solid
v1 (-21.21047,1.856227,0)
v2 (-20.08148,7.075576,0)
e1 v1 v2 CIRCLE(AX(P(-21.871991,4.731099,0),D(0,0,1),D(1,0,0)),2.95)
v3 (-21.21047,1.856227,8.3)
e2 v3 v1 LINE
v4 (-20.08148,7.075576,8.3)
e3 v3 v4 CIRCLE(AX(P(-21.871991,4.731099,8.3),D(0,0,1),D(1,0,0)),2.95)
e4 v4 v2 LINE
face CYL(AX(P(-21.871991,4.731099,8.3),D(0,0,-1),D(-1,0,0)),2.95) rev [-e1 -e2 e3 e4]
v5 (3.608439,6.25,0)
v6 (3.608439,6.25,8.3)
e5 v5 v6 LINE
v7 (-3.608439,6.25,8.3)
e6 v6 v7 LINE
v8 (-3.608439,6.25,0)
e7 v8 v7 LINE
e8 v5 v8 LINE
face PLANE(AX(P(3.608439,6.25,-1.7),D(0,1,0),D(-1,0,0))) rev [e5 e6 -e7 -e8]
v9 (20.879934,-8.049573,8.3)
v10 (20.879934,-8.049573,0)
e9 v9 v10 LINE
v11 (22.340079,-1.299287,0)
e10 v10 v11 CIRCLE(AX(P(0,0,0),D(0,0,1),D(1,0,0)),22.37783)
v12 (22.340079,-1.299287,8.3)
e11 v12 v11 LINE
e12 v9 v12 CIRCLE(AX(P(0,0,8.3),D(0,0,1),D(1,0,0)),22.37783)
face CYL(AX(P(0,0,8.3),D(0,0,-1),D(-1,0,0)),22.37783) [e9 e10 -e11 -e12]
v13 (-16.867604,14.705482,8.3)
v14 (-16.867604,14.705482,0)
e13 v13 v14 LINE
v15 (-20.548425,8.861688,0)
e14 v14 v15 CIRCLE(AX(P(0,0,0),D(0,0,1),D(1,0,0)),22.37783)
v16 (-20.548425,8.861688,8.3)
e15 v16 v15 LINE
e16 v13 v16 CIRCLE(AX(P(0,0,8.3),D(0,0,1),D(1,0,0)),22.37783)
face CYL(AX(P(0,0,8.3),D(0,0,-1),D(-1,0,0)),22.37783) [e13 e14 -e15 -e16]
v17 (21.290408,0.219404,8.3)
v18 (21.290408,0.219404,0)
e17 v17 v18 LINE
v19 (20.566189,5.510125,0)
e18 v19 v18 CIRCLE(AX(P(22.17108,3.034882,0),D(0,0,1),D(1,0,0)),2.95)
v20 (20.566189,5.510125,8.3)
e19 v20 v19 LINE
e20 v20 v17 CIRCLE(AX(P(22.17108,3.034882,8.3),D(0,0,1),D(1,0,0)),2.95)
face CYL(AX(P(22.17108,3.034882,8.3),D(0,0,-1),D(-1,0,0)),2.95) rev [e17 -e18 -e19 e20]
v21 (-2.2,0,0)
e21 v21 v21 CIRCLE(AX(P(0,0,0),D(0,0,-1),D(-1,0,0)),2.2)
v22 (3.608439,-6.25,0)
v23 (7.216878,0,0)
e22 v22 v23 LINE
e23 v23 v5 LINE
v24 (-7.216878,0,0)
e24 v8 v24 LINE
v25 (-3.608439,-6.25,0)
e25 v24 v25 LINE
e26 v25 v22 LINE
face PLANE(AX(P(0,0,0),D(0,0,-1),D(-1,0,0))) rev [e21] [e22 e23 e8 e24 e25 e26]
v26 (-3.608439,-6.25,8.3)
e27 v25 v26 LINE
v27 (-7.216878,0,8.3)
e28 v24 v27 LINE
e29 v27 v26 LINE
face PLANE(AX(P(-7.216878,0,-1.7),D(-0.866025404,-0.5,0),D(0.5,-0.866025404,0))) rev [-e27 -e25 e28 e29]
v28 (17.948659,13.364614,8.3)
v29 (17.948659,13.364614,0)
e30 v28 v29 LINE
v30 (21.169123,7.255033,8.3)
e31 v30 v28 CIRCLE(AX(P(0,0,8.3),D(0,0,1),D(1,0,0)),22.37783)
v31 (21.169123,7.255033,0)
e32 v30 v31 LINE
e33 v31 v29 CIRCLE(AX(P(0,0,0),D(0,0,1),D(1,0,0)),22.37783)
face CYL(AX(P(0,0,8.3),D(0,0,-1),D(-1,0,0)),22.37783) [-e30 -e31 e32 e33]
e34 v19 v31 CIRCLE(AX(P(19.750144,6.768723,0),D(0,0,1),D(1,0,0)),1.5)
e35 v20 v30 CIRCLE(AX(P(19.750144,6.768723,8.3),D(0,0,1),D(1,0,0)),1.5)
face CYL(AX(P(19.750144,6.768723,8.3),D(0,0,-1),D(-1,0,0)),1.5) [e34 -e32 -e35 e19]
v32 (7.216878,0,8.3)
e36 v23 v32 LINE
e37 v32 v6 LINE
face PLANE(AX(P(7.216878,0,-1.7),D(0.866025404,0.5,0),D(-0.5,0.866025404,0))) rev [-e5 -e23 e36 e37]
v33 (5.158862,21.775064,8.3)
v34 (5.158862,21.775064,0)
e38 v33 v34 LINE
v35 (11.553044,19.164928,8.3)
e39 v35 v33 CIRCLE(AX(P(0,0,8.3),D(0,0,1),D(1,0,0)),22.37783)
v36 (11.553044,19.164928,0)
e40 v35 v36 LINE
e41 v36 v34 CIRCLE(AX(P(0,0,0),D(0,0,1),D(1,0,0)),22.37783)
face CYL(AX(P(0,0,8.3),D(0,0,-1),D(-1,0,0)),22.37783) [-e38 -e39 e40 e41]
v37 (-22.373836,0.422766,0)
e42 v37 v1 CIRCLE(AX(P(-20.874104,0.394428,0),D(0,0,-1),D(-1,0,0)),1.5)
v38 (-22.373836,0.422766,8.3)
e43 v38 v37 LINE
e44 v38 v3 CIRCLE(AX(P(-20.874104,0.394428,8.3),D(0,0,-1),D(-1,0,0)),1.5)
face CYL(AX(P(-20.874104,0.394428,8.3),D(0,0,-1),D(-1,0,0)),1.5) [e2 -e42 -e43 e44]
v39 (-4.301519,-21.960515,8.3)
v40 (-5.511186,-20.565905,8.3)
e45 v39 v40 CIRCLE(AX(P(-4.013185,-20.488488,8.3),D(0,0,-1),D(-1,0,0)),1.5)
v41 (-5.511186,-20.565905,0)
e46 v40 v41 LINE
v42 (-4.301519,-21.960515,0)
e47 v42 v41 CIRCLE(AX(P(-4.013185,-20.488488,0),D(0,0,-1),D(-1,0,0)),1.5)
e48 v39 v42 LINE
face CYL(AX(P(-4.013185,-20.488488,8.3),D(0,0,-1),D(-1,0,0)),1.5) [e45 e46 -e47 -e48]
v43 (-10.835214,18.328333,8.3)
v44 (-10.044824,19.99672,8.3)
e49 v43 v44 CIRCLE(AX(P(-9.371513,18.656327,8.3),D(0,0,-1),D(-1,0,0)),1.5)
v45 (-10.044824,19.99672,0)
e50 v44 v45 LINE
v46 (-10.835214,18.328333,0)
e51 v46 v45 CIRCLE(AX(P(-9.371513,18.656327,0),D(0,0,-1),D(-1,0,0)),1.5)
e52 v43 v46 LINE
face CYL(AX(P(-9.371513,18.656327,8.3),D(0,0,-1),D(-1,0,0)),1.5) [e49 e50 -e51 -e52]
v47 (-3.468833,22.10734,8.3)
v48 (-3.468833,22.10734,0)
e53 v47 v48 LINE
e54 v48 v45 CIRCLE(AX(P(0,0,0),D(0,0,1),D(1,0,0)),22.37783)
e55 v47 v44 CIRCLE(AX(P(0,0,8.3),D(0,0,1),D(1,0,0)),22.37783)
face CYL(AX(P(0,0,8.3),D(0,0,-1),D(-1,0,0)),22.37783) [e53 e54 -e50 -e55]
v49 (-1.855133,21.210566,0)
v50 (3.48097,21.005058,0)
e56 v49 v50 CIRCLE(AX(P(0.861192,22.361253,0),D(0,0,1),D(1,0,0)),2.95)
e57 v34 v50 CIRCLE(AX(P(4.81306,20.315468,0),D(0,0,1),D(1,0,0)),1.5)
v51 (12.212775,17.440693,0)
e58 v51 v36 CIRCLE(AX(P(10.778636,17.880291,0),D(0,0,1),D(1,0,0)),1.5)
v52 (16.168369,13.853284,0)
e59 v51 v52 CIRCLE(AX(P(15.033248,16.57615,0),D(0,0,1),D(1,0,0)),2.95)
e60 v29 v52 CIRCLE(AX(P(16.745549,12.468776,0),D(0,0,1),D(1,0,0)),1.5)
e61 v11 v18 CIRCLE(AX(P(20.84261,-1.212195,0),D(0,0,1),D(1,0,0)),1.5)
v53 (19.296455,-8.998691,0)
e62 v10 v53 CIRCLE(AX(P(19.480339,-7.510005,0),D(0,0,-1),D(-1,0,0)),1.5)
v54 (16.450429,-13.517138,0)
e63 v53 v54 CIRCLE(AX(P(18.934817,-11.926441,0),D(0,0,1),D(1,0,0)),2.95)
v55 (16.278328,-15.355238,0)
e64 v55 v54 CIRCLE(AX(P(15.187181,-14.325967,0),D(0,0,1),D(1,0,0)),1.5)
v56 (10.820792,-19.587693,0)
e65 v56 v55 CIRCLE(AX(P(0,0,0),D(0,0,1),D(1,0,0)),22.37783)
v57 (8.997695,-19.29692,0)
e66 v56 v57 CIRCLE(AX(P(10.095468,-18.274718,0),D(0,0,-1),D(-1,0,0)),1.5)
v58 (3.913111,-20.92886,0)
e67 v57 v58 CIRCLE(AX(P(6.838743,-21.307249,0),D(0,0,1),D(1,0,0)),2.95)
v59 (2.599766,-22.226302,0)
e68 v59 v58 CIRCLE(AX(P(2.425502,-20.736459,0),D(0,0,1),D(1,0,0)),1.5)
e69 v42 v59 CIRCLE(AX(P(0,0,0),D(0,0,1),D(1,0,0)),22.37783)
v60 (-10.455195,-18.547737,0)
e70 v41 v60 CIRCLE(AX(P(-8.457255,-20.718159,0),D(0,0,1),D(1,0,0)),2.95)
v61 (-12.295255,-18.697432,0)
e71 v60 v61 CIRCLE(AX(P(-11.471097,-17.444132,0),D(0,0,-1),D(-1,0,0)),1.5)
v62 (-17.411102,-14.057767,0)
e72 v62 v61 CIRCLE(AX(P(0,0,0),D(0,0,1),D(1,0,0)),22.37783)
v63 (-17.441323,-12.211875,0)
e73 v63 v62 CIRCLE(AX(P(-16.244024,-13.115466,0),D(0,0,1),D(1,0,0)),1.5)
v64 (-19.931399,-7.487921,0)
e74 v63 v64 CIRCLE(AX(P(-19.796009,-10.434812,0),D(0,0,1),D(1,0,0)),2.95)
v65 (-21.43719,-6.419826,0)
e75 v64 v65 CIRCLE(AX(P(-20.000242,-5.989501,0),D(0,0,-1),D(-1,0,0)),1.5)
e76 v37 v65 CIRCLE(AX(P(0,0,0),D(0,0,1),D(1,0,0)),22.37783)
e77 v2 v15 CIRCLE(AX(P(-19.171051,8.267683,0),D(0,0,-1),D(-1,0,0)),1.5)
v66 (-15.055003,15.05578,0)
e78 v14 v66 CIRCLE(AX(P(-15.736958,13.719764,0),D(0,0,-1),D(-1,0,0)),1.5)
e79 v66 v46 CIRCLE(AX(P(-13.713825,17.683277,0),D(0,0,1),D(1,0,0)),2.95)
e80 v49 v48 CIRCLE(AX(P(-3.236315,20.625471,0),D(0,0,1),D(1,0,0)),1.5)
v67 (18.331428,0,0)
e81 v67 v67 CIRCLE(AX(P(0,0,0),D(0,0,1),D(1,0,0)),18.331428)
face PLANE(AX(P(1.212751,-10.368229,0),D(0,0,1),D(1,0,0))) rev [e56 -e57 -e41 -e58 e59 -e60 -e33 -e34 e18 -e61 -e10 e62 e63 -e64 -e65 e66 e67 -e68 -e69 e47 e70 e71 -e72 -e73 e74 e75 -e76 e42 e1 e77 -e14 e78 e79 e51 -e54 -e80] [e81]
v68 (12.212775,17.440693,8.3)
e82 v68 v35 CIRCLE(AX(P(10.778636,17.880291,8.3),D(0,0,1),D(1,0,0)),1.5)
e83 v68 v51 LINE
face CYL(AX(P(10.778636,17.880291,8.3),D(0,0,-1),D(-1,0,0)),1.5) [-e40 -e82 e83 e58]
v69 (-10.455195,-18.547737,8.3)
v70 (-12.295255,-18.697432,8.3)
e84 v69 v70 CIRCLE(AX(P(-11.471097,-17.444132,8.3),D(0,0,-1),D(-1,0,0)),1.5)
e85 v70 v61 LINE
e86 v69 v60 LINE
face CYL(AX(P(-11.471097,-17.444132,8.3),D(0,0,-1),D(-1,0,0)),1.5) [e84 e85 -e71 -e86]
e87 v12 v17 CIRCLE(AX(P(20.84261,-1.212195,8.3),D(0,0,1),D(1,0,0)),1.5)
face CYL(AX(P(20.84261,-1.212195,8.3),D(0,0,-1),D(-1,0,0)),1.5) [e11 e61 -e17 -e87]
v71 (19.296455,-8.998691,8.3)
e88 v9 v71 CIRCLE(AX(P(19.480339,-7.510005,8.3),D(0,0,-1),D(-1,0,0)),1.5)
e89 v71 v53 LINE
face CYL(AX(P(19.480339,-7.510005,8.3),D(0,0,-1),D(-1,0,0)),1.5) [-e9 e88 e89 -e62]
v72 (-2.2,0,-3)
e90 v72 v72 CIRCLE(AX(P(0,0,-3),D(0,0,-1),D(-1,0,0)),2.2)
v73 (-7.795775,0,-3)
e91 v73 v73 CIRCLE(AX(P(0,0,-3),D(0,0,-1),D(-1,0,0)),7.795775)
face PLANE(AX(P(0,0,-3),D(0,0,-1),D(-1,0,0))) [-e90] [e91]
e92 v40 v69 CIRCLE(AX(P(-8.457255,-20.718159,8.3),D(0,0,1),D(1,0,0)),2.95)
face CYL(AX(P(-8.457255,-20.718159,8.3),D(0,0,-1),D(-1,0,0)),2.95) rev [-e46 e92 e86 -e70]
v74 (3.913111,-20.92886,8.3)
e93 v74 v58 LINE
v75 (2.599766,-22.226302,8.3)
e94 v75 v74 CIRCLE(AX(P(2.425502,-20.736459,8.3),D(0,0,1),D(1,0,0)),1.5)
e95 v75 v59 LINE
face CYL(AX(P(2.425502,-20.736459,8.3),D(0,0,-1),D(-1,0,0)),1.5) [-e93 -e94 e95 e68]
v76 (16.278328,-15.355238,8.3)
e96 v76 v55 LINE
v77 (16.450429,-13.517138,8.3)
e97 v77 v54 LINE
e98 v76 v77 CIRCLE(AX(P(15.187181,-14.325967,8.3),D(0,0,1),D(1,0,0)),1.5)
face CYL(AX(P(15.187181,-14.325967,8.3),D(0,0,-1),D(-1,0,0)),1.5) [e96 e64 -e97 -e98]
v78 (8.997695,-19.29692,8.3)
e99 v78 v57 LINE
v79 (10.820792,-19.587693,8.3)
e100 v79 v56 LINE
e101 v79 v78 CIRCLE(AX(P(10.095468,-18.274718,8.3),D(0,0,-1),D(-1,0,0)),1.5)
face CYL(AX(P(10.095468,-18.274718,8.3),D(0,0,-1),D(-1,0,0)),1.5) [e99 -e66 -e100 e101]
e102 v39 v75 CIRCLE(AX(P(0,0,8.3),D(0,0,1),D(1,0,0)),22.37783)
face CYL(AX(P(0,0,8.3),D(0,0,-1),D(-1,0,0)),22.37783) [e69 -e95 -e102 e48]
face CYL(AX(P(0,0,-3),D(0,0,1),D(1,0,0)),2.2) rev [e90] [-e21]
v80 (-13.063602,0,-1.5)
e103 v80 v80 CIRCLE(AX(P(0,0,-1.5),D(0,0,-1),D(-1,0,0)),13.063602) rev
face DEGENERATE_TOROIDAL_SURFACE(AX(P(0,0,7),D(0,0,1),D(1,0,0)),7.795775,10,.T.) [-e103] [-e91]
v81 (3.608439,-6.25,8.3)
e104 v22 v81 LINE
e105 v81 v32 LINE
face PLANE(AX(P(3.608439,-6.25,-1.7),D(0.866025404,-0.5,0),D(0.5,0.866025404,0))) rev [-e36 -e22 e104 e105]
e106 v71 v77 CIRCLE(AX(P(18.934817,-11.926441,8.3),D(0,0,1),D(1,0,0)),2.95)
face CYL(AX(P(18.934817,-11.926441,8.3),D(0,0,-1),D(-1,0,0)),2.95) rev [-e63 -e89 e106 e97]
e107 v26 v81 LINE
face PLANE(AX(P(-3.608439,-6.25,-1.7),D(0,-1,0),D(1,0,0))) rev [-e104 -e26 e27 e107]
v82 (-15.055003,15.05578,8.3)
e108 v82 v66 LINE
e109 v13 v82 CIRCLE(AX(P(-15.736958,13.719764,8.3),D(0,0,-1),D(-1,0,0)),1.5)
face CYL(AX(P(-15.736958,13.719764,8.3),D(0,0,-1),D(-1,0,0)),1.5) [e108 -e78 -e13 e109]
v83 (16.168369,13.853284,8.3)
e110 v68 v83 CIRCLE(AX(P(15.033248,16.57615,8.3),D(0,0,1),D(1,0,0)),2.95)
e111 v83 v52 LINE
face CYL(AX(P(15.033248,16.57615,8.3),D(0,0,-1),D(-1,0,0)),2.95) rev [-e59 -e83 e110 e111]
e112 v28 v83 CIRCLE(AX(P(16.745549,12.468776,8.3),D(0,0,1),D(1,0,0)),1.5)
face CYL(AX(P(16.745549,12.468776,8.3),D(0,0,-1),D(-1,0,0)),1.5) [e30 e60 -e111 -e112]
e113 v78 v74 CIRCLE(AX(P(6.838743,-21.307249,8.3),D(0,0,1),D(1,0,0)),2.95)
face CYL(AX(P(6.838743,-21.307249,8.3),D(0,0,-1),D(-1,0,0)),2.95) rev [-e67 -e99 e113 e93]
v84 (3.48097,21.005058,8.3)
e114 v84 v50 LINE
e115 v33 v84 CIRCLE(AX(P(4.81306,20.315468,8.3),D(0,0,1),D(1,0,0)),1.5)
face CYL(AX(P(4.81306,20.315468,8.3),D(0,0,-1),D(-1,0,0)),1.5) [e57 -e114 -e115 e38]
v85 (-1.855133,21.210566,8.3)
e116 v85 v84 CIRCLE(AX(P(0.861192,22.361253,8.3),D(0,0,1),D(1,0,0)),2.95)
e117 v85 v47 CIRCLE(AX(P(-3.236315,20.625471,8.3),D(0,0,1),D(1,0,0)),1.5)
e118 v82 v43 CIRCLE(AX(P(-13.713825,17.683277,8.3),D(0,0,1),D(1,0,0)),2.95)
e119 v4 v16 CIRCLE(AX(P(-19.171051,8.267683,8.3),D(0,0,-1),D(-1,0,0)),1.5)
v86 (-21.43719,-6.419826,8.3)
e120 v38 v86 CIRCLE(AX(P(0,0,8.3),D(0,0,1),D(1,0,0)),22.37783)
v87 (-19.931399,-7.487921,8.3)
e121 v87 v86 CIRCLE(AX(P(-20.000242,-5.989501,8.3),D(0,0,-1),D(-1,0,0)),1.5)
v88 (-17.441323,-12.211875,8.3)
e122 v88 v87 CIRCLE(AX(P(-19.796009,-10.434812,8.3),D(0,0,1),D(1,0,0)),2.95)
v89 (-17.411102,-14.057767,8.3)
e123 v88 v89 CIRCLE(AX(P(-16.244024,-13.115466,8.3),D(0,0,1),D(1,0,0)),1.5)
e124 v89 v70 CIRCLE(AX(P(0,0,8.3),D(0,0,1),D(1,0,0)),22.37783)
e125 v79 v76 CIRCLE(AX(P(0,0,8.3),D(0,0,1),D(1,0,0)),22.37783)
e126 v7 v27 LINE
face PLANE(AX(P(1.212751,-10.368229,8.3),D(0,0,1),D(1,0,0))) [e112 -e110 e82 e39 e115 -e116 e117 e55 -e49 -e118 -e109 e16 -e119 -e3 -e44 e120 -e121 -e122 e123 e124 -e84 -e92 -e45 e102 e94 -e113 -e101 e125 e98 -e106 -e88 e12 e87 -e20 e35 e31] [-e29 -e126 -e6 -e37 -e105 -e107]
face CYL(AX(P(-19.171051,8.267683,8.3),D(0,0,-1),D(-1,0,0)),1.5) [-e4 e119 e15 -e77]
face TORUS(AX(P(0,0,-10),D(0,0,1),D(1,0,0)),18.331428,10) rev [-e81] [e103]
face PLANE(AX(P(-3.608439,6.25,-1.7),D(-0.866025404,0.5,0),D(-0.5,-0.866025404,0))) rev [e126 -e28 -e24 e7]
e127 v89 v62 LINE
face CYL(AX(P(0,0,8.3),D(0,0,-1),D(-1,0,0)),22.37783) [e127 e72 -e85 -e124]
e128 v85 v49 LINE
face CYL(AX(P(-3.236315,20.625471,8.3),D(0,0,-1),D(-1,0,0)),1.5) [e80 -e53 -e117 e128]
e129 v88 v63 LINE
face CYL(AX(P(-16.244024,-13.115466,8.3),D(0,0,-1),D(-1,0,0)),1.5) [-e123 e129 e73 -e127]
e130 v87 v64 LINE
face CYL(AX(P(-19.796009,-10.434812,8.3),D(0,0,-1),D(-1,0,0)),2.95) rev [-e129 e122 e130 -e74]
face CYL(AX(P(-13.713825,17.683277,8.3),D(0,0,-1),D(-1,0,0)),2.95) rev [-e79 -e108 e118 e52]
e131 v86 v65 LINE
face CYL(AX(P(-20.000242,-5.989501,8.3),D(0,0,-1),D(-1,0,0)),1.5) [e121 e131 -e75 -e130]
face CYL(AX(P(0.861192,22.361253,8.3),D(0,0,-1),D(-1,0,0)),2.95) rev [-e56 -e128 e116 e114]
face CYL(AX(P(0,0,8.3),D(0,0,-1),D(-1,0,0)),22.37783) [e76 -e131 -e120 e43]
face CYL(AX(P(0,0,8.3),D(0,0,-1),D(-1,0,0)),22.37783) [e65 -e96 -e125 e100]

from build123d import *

# Parameters (mm, degrees)
CROQUIS1_R              = 2.2
SALIENTE_EXTRUIR1_DEPTH = 8.3
CORTAR_EXTRUIR1_DEPTH   = 10
CROQUIS3_R              = 11.19
CROQUIS3_R_2            = 2.2
SALIENTE_EXTRUIR2_DEPTH = 3
REDONDEO1_R             = 10
REDONDEO2_R             = 10


with BuildPart() as part:
    # Croquis1 → Saliente-Extruir1 (new body)
    with BuildSketch(Plane.XY):
        with BuildLine():
            ThreePointArc((-1.855132773, 21.210566025), (0.747663665, 19.413438157), (3.480969897, 21.005058374))
            ThreePointArc((3.480969897, 21.005058374), (4.187425829, 21.678765959), (5.158862158, 21.775064198))
            ThreePointArc((5.158862158, 21.775064198), (8.457254598, 20.718159287), (11.553044037, 19.164927682))
            ThreePointArc((11.553044037, 19.164927682), (12.17958806, 18.416325998), (12.212774884, 17.4406926))
            ThreePointArc((12.212774884, 17.4406926), (13.051461105, 14.390967482), (16.16836891, 13.853283925))
            ThreePointArc((16.16836891, 13.853283925), (17.142596439, 13.915272757), (17.948659156, 13.364614252))
            ThreePointArc((17.948659156, 13.364614252), (19.796008974, 10.434812326), (21.16912324, 7.255032793))
            ThreePointArc((21.16912324, 7.255032793), (21.16789192, 6.278835898), (20.566189442, 5.510125275))
            ThreePointArc((20.566189442, 5.510125275), (19.248334843, 2.634803184), (21.290408418, 0.219403966))
            ThreePointArc((21.290408418, 0.219403966), (22.076555656, -0.359331218), (22.340079057, -1.299287234))
            ThreePointArc((22.340079057, -1.299287234), (21.871990743, -4.731099292), (20.879934411, -8.049572571))
            ThreePointArc((20.879934411, -8.049572571), (20.251503896, -8.796591301), (19.296455393, -8.998690904))
            ThreePointArc((19.296455393, -8.998690904), (16.438698786, -10.354214806), (16.450429211, -13.517137548))
            ThreePointArc((16.450429211, -13.517137548), (16.680649129, -14.465800124), (16.278327685, -15.355237783))
            ThreePointArc((16.278327685, -15.355237783), (13.713824964, -17.683276971), (10.820792216, -19.587693468))
            ThreePointArc((10.820792216, -19.587693468), (9.859212129, -19.755995666), (8.997695409, -19.2969196))
            ThreePointArc((8.997695409, -19.2969196), (5.937212872, -18.498380614), (3.91311135, -20.928860176))
            ThreePointArc((3.91311135, -20.928860176), (3.479681489, -21.803560382), (2.599765876, -22.226301918))
            ThreePointArc((2.599765876, -22.226301918), (-0.861191929, -22.361252828), (-4.301518916, -21.960514898))
            ThreePointArc((-4.301518916, -21.960514898), (-5.146314566, -21.471350096), (-5.511186255, -20.565905154))
            ThreePointArc((-5.511186255, -20.565905154), (-7.34236093, -17.986948546), (-10.455194801, -18.54773653))
            ThreePointArc((-10.455194801, -18.54773653), (-11.349467792, -18.939192417), (-12.29525528, -18.697432369))
            ThreePointArc((-12.29525528, -18.697432369), (-15.033247546, -16.576149969), (-17.411101542, -14.057767343))
            ThreePointArc((-17.411101542, -14.057767343), (-17.743823481, -13.140021189), (-17.44132262, -12.211875121))
            ThreePointArc((-17.44132262, -12.211875121), (-17.186362452, -9.059223351), (-19.931399108, -7.487920827))
            ThreePointArc((-19.931399108, -7.487920827), (-20.868074958, -7.212965835), (-21.437189843, -6.419826415))
            ThreePointArc((-21.437189843, -6.419826415), (-22.171079561, -3.034882316), (-22.373836253, 0.422765786))
            ThreePointArc((-22.373836253, 0.422765786), (-22.038800189, 1.339669668), (-21.210470293, 1.856227))
            ThreePointArc((-21.210470293, 1.856227), (-18.988673977, 4.107413132), (-20.08148026, 7.075576251))
            ThreePointArc((-20.08148026, 7.075576251), (-20.622277928, 7.888287624), (-20.548425031, 8.861687667))
            ThreePointArc((-20.548425031, 8.861687667), (-18.934817045, 11.926440502), (-16.867604324, 14.705482106))
            ThreePointArc((-16.867604324, 14.705482106), (-16.021577354, 15.192514199), (-15.055003187, 15.055779879))
            ThreePointArc((-15.055003187, 15.055779879), (-11.905973913, 15.352145362), (-10.835213617, 18.328332564))
            ThreePointArc((-10.835213617, 18.328332564), (-10.727087865, 19.298523636), (-10.044823777, 19.996719603))
            ThreePointArc((-10.044823777, 19.996719603), (-6.838743197, 21.307249261), (-3.468832869, 22.107339915))
            ThreePointArc((-3.468832869, 22.107339915), (-2.507680415, 21.936612489), (-1.855132773, 21.210566025))
        make_face()
        with Locations(Location((0, 0, 0), (0, 0, 180))):
            Circle(CROQUIS1_R, mode=Mode.SUBTRACT)
    extrude(amount=SALIENTE_EXTRUIR1_DEPTH)

    # Croquis2 → Cortar-Extruir1 (cut)
    with BuildSketch(Plane.XY.offset(8.3)):
        Polygon((7.216878365, 0), (3.608439182, 6.25), (-3.608439182, 6.25), (-7.216878365, 0), (-3.608439182, -6.25), (3.608439182, -6.25), align=None)
    extrude(amount=-CORTAR_EXTRUIR1_DEPTH, mode=Mode.SUBTRACT)

    # Croquis3 → Saliente-Extruir2 (add)
    with BuildSketch(Plane(origin=(0, 0, 0), x_dir=(-1, 0, 0), z_dir=(0, 0, -1))):
        with Locations(Location((0, 0, 0), (0, 0, 180))):
            Circle(CROQUIS3_R)
        Circle(CROQUIS3_R_2, mode=Mode.SUBTRACT)
    extrude(amount=SALIENTE_EXTRUIR2_DEPTH)

    # Redondeo1
    # the kernel refuses this fillet: 10 mm, written as the material it adds along each edge
    with BuildSketch(Plane(origin=(0, 0, 0), x_dir=(1, 0, 0), z_dir=(0, 1, 0))) as redondeo1_piece_1:
        with BuildLine():
            CenterArc((18.331428429, 10), REDONDEO1_R, 224.427004001, 45.572995999)
            Line((11.19, 3), (11.047171431, 2.86))
            ThreePointArc((11.047171431, 2.86), (10.99, 1.5), (10.99, 0))
            Line((10.99, 0), (11.19, -0.2))
            Line((11.19, -0.2), (18.331428429, -0.2))
            Line((18.331428429, -0.2), (18.331428429, 0))
        make_face()
    revolve(axis=Axis((0, 0, 0), (0, 0, -1)))

    # Redondeo2
    redondeo2_edges = [part.edges().sort_by_distance(p)[0] for p in [
        (-11.19, 0, -3),
    ]]
    fillet(redondeo2_edges, radius=REDONDEO2_R)


solid = part.part
